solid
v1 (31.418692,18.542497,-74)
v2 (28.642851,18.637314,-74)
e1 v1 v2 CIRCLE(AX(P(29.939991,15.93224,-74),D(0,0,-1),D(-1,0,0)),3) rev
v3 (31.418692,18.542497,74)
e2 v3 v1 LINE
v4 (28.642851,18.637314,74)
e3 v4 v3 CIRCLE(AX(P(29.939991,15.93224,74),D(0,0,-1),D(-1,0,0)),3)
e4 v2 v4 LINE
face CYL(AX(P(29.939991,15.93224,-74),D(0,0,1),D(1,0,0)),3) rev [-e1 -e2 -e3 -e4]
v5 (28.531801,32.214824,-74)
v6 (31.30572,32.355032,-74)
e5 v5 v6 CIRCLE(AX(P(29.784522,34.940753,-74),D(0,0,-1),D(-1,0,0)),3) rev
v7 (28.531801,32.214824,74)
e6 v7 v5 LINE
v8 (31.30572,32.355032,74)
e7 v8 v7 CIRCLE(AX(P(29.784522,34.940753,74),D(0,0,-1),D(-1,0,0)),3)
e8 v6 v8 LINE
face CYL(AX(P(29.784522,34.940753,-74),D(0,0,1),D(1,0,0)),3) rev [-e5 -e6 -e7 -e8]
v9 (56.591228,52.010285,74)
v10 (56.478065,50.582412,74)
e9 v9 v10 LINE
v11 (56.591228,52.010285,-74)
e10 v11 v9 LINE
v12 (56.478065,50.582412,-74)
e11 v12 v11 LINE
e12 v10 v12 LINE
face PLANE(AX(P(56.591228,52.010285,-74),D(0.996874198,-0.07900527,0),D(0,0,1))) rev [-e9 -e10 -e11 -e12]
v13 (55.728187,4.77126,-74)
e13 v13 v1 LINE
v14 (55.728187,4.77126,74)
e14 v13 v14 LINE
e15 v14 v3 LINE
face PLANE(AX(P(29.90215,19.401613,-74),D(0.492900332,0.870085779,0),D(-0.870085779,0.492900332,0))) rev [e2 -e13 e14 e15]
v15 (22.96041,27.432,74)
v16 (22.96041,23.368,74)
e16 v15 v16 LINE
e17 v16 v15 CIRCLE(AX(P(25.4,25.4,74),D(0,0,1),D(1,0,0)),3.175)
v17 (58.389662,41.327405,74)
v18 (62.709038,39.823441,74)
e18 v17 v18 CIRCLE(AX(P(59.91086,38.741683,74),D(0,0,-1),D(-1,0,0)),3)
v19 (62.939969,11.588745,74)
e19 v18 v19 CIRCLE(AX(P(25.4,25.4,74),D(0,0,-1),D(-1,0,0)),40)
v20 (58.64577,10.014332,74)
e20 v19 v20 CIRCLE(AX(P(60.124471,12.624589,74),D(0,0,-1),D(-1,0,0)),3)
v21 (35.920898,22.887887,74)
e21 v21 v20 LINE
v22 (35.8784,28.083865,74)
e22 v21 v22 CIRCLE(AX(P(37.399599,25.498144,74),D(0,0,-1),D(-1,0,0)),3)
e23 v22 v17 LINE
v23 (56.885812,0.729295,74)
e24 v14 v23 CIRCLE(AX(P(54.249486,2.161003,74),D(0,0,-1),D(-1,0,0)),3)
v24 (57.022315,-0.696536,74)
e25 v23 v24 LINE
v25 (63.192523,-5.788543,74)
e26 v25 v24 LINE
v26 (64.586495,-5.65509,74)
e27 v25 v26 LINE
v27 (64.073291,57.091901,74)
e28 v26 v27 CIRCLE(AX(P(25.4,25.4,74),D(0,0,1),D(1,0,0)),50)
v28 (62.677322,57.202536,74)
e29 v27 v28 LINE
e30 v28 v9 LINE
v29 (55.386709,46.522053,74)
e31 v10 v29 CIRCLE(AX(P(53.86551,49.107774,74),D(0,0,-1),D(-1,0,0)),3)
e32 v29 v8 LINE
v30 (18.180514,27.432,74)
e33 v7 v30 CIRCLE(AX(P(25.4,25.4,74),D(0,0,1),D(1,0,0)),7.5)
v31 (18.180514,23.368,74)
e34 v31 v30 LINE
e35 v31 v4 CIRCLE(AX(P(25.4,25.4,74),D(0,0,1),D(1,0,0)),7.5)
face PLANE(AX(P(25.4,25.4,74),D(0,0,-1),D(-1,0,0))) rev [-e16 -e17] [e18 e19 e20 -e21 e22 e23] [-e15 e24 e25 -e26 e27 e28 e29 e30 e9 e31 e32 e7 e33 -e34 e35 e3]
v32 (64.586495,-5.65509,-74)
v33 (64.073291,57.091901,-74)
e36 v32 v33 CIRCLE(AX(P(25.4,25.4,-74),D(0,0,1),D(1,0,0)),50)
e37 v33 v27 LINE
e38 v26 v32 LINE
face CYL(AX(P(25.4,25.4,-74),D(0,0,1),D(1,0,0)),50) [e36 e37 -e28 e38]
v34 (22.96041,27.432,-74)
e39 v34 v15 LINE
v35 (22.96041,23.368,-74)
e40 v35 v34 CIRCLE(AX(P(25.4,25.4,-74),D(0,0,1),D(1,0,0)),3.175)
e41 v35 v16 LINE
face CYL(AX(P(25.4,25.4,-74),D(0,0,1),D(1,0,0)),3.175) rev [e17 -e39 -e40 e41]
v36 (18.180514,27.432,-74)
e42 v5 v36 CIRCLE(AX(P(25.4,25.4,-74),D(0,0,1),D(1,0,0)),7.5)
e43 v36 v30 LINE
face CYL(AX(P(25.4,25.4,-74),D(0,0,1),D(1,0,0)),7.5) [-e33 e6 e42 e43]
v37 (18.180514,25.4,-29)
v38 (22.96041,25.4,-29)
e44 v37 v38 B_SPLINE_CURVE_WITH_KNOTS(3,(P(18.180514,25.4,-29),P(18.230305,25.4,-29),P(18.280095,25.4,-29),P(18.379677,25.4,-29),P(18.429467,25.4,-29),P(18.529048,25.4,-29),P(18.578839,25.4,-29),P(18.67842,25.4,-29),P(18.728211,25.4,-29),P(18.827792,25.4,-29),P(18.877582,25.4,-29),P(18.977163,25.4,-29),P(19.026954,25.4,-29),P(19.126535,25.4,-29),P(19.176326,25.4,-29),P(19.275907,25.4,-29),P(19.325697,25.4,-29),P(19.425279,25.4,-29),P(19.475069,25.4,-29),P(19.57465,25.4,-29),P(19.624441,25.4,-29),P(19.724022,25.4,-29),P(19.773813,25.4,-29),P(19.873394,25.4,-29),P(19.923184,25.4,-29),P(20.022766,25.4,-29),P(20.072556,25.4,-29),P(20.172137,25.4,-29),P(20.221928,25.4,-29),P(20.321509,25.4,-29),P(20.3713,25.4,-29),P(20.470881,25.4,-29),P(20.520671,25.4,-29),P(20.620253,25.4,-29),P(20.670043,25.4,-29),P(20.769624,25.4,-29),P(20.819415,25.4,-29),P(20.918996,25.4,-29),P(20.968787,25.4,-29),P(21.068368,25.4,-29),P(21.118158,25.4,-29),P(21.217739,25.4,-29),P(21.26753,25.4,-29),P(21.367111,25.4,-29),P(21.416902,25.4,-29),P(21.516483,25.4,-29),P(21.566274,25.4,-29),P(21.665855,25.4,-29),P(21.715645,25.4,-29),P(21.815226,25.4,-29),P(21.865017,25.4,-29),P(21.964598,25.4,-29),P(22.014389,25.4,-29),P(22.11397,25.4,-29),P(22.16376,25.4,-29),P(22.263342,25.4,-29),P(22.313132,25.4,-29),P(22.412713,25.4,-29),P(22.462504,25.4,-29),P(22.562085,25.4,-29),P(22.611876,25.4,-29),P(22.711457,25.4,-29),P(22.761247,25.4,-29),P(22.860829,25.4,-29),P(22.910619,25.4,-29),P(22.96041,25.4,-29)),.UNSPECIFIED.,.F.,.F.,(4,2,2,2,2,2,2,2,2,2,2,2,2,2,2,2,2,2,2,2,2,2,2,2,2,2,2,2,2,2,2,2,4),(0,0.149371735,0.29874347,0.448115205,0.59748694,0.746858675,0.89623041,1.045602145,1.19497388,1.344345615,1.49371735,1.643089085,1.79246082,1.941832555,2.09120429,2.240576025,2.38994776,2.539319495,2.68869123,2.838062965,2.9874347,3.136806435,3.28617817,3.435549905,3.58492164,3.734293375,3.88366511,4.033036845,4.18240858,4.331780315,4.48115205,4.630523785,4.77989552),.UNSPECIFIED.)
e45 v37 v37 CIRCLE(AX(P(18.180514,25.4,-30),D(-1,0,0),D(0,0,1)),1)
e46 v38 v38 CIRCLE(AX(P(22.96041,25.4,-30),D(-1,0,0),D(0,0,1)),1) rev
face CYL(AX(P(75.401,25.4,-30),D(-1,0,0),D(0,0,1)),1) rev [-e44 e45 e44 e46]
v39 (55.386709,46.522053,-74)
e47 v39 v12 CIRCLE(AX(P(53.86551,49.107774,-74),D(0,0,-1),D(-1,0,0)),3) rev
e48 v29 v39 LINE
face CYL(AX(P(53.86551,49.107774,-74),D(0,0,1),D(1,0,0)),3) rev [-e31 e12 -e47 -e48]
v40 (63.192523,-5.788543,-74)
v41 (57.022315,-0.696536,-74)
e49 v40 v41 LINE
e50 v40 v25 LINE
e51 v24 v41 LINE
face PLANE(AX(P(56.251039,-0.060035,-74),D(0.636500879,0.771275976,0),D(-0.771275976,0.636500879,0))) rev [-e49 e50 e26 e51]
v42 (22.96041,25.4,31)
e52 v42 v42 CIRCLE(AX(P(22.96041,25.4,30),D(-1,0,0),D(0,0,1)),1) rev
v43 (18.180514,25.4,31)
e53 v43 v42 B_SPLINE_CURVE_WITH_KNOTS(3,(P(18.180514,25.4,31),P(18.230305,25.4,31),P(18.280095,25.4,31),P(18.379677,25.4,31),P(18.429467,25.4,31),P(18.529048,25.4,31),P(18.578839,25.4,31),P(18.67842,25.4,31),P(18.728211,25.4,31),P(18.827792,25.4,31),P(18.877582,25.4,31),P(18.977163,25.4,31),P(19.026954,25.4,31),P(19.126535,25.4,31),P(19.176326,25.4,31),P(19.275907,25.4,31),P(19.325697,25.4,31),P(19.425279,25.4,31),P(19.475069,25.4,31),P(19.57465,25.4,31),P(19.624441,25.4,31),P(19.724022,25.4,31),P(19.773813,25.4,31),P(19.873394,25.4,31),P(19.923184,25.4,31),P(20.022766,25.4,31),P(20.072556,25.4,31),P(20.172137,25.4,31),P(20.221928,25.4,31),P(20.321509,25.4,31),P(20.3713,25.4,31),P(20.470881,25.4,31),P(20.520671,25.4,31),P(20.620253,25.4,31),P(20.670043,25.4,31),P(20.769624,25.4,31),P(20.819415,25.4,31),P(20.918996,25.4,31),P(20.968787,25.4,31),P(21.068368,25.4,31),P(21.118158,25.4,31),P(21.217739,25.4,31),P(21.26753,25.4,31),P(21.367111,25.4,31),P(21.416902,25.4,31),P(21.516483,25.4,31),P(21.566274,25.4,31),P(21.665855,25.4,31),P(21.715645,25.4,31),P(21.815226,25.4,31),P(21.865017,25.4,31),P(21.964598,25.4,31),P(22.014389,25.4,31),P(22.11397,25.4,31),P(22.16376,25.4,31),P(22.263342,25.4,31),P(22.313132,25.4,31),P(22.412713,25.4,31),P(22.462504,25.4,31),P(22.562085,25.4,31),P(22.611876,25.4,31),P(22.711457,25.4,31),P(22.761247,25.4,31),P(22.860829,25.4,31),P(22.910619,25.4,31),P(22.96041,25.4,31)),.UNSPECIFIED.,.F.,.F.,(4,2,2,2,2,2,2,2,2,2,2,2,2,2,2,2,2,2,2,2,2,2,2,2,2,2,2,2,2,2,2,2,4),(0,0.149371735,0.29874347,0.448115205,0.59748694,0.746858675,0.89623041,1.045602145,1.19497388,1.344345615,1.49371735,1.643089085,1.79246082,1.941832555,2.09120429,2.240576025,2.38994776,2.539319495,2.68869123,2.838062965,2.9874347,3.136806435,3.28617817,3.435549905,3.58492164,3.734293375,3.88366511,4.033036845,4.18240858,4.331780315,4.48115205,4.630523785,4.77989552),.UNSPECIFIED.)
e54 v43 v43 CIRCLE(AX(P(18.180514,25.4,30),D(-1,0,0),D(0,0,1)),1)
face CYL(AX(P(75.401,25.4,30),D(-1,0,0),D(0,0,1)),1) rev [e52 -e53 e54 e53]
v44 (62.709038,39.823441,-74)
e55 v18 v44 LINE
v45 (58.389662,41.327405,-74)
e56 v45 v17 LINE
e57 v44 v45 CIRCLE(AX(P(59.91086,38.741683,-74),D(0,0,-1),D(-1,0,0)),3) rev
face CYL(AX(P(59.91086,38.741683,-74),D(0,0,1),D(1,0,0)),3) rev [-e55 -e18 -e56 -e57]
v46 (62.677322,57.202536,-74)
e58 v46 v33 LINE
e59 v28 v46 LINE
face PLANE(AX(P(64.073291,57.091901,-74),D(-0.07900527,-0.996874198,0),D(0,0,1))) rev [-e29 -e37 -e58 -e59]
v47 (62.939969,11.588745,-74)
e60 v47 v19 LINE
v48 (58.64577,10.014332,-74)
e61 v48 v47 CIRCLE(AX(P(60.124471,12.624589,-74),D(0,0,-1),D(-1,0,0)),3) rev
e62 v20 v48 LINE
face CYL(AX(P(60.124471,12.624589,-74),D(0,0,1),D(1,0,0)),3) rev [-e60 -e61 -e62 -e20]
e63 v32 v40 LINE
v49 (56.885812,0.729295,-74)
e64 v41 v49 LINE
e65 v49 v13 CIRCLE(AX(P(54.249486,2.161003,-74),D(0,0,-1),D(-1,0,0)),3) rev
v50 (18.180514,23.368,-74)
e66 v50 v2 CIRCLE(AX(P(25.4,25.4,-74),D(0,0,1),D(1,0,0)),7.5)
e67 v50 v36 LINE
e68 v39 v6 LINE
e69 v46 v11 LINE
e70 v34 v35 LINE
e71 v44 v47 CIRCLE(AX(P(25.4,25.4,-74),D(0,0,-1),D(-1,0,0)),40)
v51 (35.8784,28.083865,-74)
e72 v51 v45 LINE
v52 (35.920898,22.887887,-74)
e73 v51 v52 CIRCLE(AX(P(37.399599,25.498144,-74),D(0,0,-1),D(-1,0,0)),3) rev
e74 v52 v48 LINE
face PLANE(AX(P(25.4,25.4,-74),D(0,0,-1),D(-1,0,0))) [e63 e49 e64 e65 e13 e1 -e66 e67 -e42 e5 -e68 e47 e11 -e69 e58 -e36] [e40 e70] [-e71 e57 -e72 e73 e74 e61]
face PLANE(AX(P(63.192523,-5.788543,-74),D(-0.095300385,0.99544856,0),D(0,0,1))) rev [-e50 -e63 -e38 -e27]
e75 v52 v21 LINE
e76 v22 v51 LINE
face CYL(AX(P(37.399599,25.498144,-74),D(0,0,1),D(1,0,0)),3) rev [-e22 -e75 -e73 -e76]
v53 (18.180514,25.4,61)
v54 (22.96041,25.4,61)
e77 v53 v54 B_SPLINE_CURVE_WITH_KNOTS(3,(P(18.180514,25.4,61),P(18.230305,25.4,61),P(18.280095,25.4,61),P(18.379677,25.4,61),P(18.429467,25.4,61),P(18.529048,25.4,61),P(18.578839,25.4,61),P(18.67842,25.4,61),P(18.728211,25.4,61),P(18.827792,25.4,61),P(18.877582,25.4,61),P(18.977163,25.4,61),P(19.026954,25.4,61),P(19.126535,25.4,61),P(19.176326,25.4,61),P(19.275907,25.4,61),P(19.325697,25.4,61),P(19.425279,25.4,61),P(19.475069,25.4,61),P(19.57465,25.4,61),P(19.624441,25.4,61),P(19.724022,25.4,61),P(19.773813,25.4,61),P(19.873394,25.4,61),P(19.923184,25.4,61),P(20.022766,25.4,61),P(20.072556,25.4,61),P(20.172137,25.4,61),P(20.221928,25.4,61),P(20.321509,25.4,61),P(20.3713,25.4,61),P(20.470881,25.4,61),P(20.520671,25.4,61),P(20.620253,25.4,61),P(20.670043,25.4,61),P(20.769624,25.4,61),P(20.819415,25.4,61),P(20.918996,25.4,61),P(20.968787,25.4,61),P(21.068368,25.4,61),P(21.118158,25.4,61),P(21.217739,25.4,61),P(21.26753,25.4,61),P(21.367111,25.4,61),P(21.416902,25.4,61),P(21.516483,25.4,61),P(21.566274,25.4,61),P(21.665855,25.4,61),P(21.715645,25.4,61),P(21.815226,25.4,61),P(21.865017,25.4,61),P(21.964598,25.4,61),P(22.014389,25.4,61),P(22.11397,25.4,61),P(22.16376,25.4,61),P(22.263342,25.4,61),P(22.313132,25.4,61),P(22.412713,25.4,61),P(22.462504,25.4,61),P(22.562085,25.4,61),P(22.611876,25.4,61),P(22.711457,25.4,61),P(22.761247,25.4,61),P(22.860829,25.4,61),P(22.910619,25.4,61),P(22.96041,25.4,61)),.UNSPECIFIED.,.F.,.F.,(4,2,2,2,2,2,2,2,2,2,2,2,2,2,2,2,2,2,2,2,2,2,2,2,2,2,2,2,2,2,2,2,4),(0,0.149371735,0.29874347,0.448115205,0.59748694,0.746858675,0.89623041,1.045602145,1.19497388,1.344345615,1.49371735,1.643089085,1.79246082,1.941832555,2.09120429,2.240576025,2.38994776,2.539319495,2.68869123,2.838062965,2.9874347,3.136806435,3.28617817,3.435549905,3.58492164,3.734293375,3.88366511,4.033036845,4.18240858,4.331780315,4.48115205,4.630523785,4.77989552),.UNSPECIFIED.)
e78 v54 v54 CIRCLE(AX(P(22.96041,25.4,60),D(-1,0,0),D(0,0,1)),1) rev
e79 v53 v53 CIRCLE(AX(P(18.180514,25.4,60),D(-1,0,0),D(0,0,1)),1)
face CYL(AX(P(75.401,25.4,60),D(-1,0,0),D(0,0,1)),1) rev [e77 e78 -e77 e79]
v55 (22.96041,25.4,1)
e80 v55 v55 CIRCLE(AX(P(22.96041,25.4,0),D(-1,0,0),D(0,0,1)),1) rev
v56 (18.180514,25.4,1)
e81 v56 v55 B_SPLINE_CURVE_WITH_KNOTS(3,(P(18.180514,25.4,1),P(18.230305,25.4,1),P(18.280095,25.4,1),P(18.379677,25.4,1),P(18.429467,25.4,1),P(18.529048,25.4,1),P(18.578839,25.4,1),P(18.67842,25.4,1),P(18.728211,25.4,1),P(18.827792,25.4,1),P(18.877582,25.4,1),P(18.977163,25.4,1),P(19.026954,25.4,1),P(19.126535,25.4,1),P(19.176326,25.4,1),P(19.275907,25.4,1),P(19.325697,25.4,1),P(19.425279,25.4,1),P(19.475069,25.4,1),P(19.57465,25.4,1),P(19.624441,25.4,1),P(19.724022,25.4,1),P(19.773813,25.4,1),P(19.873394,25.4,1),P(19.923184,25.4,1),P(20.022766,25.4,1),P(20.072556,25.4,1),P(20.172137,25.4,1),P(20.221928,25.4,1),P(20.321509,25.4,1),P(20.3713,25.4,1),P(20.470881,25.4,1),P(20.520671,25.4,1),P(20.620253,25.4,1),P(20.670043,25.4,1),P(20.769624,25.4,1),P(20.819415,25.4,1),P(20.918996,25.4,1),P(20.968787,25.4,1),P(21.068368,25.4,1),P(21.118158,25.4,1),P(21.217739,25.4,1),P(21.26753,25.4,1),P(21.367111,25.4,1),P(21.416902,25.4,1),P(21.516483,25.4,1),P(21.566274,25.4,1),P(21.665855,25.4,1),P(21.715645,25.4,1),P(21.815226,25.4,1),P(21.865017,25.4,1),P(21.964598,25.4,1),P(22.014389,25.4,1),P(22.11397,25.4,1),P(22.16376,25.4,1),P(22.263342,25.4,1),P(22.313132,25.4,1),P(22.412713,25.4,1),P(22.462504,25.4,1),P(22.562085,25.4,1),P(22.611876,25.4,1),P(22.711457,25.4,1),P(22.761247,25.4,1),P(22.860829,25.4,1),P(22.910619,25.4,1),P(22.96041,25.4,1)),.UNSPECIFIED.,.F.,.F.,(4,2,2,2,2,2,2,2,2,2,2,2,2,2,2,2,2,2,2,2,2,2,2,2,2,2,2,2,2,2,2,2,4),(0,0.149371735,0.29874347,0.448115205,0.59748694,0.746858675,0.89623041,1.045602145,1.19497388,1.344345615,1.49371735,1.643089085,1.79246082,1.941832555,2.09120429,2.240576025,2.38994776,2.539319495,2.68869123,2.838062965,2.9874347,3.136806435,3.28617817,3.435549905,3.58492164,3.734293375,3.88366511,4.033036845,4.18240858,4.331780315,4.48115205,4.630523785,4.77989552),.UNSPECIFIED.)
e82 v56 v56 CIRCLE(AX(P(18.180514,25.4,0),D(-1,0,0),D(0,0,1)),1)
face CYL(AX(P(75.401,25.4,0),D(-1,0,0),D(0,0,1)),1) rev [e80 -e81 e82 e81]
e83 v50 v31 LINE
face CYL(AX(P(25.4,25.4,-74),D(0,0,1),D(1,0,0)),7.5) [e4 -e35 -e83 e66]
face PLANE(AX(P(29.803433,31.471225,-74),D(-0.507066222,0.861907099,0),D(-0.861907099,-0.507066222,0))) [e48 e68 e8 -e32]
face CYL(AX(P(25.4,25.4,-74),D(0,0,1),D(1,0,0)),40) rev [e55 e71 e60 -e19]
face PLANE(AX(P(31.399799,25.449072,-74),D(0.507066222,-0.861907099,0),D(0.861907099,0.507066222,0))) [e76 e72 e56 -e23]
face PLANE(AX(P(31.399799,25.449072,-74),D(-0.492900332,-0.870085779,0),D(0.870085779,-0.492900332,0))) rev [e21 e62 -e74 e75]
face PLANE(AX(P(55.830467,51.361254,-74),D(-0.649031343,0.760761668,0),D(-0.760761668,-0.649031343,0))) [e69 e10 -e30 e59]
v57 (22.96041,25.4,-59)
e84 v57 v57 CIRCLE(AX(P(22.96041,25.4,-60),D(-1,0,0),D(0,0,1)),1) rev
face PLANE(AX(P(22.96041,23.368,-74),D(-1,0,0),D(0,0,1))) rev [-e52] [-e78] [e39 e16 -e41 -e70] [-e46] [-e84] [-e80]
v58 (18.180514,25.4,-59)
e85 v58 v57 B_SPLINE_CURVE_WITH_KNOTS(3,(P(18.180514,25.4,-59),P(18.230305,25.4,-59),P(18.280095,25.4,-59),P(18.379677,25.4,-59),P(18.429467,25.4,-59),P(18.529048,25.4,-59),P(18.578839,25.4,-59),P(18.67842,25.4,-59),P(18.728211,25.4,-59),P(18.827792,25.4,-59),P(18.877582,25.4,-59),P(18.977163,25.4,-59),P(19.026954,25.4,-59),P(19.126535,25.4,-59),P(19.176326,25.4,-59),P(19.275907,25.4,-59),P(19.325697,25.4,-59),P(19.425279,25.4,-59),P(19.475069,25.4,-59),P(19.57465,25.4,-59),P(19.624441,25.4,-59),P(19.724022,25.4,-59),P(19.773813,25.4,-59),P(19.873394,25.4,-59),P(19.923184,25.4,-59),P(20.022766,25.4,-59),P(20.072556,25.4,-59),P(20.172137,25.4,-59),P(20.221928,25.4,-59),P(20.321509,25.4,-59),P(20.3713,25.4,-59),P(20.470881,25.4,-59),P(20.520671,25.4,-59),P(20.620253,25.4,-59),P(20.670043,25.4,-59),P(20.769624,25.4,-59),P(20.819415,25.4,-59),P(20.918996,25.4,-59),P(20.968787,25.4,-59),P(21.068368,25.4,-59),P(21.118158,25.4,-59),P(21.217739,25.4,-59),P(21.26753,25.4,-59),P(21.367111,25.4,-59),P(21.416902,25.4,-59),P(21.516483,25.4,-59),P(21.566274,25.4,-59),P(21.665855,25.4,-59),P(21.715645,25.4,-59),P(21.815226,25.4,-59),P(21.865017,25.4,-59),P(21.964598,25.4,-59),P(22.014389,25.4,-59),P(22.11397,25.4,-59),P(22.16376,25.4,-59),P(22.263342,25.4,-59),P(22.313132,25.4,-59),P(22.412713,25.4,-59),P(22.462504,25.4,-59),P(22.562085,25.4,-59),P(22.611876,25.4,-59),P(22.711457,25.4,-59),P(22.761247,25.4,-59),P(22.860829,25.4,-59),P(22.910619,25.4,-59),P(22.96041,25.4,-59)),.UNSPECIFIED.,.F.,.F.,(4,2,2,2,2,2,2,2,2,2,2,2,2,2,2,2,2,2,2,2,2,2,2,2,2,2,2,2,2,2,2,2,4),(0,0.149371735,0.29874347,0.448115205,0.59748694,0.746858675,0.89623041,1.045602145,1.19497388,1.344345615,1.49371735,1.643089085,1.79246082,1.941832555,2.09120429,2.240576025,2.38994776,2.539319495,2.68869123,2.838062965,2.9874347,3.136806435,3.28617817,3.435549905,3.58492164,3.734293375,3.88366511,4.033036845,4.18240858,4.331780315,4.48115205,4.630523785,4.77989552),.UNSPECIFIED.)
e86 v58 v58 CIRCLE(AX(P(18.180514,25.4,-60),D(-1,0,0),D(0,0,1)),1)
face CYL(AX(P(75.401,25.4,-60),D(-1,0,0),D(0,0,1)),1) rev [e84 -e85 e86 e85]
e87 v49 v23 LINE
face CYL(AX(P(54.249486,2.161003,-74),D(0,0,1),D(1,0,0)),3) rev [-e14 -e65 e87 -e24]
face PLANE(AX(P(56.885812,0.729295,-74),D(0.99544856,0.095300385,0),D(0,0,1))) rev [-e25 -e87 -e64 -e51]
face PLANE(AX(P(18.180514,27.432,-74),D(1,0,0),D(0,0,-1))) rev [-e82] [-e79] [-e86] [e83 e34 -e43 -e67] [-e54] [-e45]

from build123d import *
from build123d.topology import SkipClean

# Parameters (mm, degrees)
BOSS_EXTRUDE1_DEPTH     = 74
CHAMFER1_SIZE           = 1
FILLET1_R               = 3
CUT_EXTRUDE1_DEPTH      = 121.138628729
CUT_EXTRUDE1_DEPTH_BACK = 121.138628729
CUT_EXTRUDE2_REACH      = 111.646
SKETCH4_R               = 1


with BuildPart() as part:
    # Sketch1 → Boss-Extrude1 (new, symmetric)
    with BuildSketch(Plane.XY):
        with BuildLine():
            Line((55.830466766, 51.361253738), (63.438083445, 57.851567172))
            ThreePointArc((63.438083445, 57.851567172), (72.243195979, 42.88470747), (75.398327752, 25.808934001))
            Line((75.398327752, 25.808934001), (65.398662212, 25.727147202))
            ThreePointArc((65.398662212, 25.727147202), (64.324262485, 34.614216947), (61.300381376, 43.039802177))
            Line((61.300381376, 43.039802177), (31.399799374, 25.449072083))
            Line((31.399799374, 25.449072083), (26.399966604, 25.408178684))
            ThreePointArc((26.399966604, 25.408178684), (25.395910676, 26.399991642), (24.40000005, 25.400000004))
            ThreePointArc((24.40000005, 25.400000004), (24.411675325, 25.24763781), (24.446428526, 25.098833357))
            Line((24.446428526, 25.098833357), (18.248213622, 23.141250154))
            ThreePointArc((18.248213622, 23.141250154), (17.987564613, 24.25728355), (17.90000005, 25.400000004))
            ThreePointArc((17.90000005, 25.400000004), (21.992343112, 32.081158151), (29.803433168, 31.471225314))
            Line((29.803433168, 31.471225314), (58.257984046, 48.211244769))
            ThreePointArc((58.257984046, 48.211244769), (57.083396924, 49.816436323), (55.830466766, 51.361253738))
        make_face()
    boss_extrude1 = extrude(amount=BOSS_EXTRUDE1_DEPTH, both=True)

    # Mirror1: Boss-Extrude1 across plane
    with SkipClean():  # the faces are left unmerged after this step: merging them gives an invalid solid
        add(boss_extrude1.mirror(Plane(origin=(-0.206032496, 25.190569454, 0), x_dir=(0, 0, 1), z_dir=(0.008178679945042752, -0.9999665540378622, 0))))

    # Chamfer1
    # the kernel refuses this chamfer: 1 mm, written as the material it takes off along each edge
    with BuildSketch(Plane(origin=(55.830466766, 51.361253738, -76.604800739), x_dir=(0.7607616678932755, 0.6490313433604278, 0), z_dir=(0, 0, 1))) as chamfer1_piece_1:
        with BuildLine():
            Line((CHAMFER1_SIZE, 0), (-0.01282473, -1.01282473))
            ThreePointArc((-0.01282473, -1.01282473), (-0.003390265, -0.520777989), (0, 0))
            Line((0, 0), (CHAMFER1_SIZE, 0))
        make_face()
    extrude(amount=153.209601479, mode=Mode.SUBTRACT)
    with BuildSketch(Plane(origin=(63.438083445, 57.851567172, 76.571682988), x_dir=(-0.7607616678932776, -0.6490313433604255, 0), z_dir=(0, 0, -1))) as chamfer1_piece_2:
        with BuildLine():
            Line((CHAMFER1_SIZE, 0), (0.009805807, -0.990194193))
            ThreePointArc((0.009805807, -0.990194193), (0.002592086, -0.509118755), (0, 0))
            Line((0, 0), (CHAMFER1_SIZE, 0))
        make_face()
    extrude(amount=153.143365976, mode=Mode.SUBTRACT)
    with BuildSketch(Plane(origin=(63.963798858, -6.425043932, 76.571682988), x_dir=(0.6288321665267481, 0.7775410640868277, 0), z_dir=(0, 0, -1))) as chamfer1_piece_3:
        with BuildLine():
            Line((0.990242745, 0), (CHAMFER1_SIZE * 0.00990242744899, -CHAMFER1_SIZE * 0.999950969763))
            Line((CHAMFER1_SIZE * 0.00990242744899, -CHAMFER1_SIZE * 0.999950969763), (0, 0))
            ThreePointArc((0, 0), (0.509119461, 0.002449552), (0.990242745, 0))
        make_face()
    extrude(amount=153.143365976, mode=Mode.SUBTRACT)
    with BuildSketch(Plane(origin=(56.251039097, -0.060035145, -76.604800739), x_dir=(0.6266844831673307, 0.7792730962616993, 0), z_dir=(0, 0, 1))) as chamfer1_piece_4:
        with BuildLine():
            Line((1.012905922, 0), (-CHAMFER1_SIZE * 0.0126613240298, -CHAMFER1_SIZE * 0.999919842224))
            Line((-CHAMFER1_SIZE * 0.0126613240298, -CHAMFER1_SIZE * 0.999919842224), (0, 0))
            ThreePointArc((0, 0), (0.520779169, -0.003203746), (1.012905922, 0))
        make_face()
    extrude(amount=153.209601479, mode=Mode.SUBTRACT)

    # Fillet1
    # the kernel refuses this fillet: 3 mm, written as the material it adds along each edge
    with BuildSketch(Plane(origin=(61.300381376, 43.039802177, 74), x_dir=(-0.8619070987590498, -0.5070662216207636, 0), z_dir=(0, 0, -1))) as fillet1_piece_1:
        with BuildLine():
            CenterArc((3.377068823, -3), FILLET1_R, 90, 99.332418184)
            Line((0.416776456, -3.486486486), (0.357570609, -3.496216216))
            ThreePointArc((0.357570609, -3.496216216), (0.110537283, -1.754940397), (-0.059831012, -0.0045))
            Line((-0.059831012, -0.0045), (0, 0.06))
            Line((0, 0.06), (3.377068823, 0.06))
            Line((3.377068823, 0.06), (3.377068823, 0))
        make_face()
    extrude(amount=148)
    with BuildSketch(Plane(origin=(31.399799374, 25.449072083, 74), x_dir=(0.861907098759051, 0.5070662216207618, 0), z_dir=(0, 0, -1))) as fillet1_piece_2:
        with BuildLine():
            CenterArc((FILLET1_R * 1.73205080757, FILLET1_R), FILLET1_R, 150, 120)
            Line((FILLET1_R * 0.866025403784, FILLET1_R * 1.5), (FILLET1_R * 0.848704895709, FILLET1_R * 1.51))
            Line((FILLET1_R * 0.848704895709, FILLET1_R * 1.51), (-FILLET1_R * 0.0346410161514, -FILLET1_R * 0.02))
            Line((-FILLET1_R * 0.0346410161514, -FILLET1_R * 0.02), (FILLET1_R * 1.73205080757, -FILLET1_R * 0.02))
            Line((FILLET1_R * 1.73205080757, -FILLET1_R * 0.02), (FILLET1_R * 1.73205080757, 0))
        make_face()
    extrude(amount=148)
    with BuildSketch(Plane(origin=(29.803433168, 31.471225314, -74), x_dir=(-0.8632427379298097, 0.5047890405025113, 0), z_dir=(0, 0, 1))) as fillet1_piece_3:
        with BuildLine():
            CenterArc((1.767704789, -2.985498375), FILLET1_R, 95.63586305, 55.150095421)
            Line((-0.850702684, -1.521277659), (-0.903070833, -1.491993244))
            Line((-0.903070833, -1.491993244), (-0.052368149, 0.029284414))
            Line((-0.052368149, 0.029284414), (0.005892349, 0.059709968))
            ThreePointArc((0.005892349, 0.059709968), (0.736543662, 0.023745938), (1.467194975, 0.059709968))
            Line((1.467194975, 0.059709968), (1.473087324, 0))
        make_face()
    extrude(amount=148)
    with BuildSketch(Plane(origin=(58.257984046, 48.211244769, -74), x_dir=(-0.6003331349359272, 0.7997500403863709, 0), z_dir=(0, 0, 1))) as fillet1_piece_4:
        with BuildLine():
            CenterArc((3.35394685, 2.974664865), FILLET1_R, 173.574848661, 88.973633867)
            Line((0.372790176, 3.310380343), (0.313167042, 3.317094653))
            Line((0.313167042, 3.317094653), (-0.059623133, 0.00671431))
            Line((-0.059623133, 0.00671431), (-0.002223664, -0.05995878))
            ThreePointArc((-0.002223664, -0.05995878), (1.482442617, -0.087479891), (2.957104003, -0.059493297))
            Line((2.957104003, -0.059493297), (2.964885235, 0))
        make_face()
    extrude(amount=148)
    with BuildSketch(Plane(origin=(61.584109507, 8.349773529, 74), x_dir=(-0.8700857787040926, 0.49290033241710485, 0), z_dir=(0, 0, -1))) as fillet1_piece_5:
        with BuildLine():
            CenterArc((3.377068823, 3), FILLET1_R, 170.667581816, 99.332418184)
            Line((0.416776456, 3.486486486), (0.357570609, 3.496216216))
            ThreePointArc((0.357570609, 3.496216216), (0.110537283, 1.754940397), (-0.059831012, 0.0045))
            Line((-0.059831012, 0.0045), (0, -0.06))
            Line((0, -0.06), (3.377068823, -0.06))
            Line((3.377068823, -0.06), (3.377068823, 0))
        make_face()
    extrude(amount=148)
    with BuildSketch(Plane(origin=(58.626707512, 3.129258857, -74), x_dir=(-0.870085778704093, 0.49290033241710457, 0), z_dir=(0, 0, 1))) as fillet1_piece_6:
        with BuildLine():
            CenterArc((3.331304629, 3), FILLET1_R, 181.026366133, 88.973633867)
            Line((0.331785955, 2.946262469), (0.271795581, 2.945187718))
            ThreePointArc((0.271795581, 2.945187718), (0.078962557, 1.482920686), (-0.059831012, 0.0045))
            Line((-0.059831012, 0.0045), (0, -0.06))
            Line((0, -0.06), (3.331304629, -0.06))
            Line((3.331304629, -0.06), (3.331304629, 0))
        make_face()
    extrude(amount=148)
    with BuildSketch(Plane(origin=(29.902149966, 19.401613043, -74), x_dir=(-0.8548705120852164, -0.5188414088786282, 0), z_dir=(0, 0, 1))) as fillet1_piece_7:
        with BuildLine():
            CenterArc((1.767704789, 2.985498375), FILLET1_R, 209.214041529, 55.150095421)
            Line((-0.850702684, 1.521277659), (-0.903070833, 1.491993244))
            Line((-0.903070833, 1.491993244), (-0.052368149, -0.029284414))
            Line((-0.052368149, -0.029284414), (0.005892349, -0.059709968))
            ThreePointArc((0.005892349, -0.059709968), (0.736543662, -0.023745938), (1.467194975, -0.059709968))
            Line((1.467194975, -0.059709968), (1.473087324, 0))
        make_face()
    extrude(amount=148)

    # Sketch3 → Cut-Extrude1 (cut, two sides: drawn at the far end of the back side and taken through both)
    with BuildSketch(Plane.XY.offset(-CUT_EXTRUDE1_DEPTH_BACK)):
        with BuildLine():
            Line((22.960409716, 23.368000004), (22.960409716, 27.432000004))
            ThreePointArc((22.960409716, 27.432000004), (28.57500005, 25.400000004), (22.960409716, 23.368000004))
        make_face()
        with BuildLine():
            Line((18.180514196, 27.432000004), (18.180514196, 23.368000004))
            ThreePointArc((18.180514196, 23.368000004), (17.90000005, 25.400000004), (18.180514196, 27.432000004))
        make_face()
    extrude(amount=CUT_EXTRUDE1_DEPTH + CUT_EXTRUDE1_DEPTH_BACK, mode=Mode.SUBTRACT)

    # Sketch4 → Cut-Extrude2 (cut, up to next)
    with BuildSketch(Plane.ZY.offset(-18.180514196), mode=Mode.PRIVATE) as cut_extrude2_sk1:
        with Locations((0, 25.400000004)):
            Circle(SKETCH4_R)
    cut_extrude2_tool1 = extrude(cut_extrude2_sk1.sketch, amount=-CUT_EXTRUDE2_REACH, mode=Mode.PRIVATE) & part.part
    # Sketch4 → Cut-Extrude2 (cut, up to next)
    with BuildSketch(Plane.ZY.offset(-18.180514196), mode=Mode.PRIVATE) as cut_extrude2_sk2:
        with Locations((30, 25.400000004)):
            Circle(SKETCH4_R)
    cut_extrude2_tool2 = extrude(cut_extrude2_sk2.sketch, amount=-CUT_EXTRUDE2_REACH, mode=Mode.PRIVATE) & part.part
    # Sketch4 → Cut-Extrude2 (cut, up to next)
    with BuildSketch(Plane.ZY.offset(-18.180514196), mode=Mode.PRIVATE) as cut_extrude2_sk3:
        with Locations((60, 25.400000004)):
            Circle(SKETCH4_R)
    cut_extrude2_tool3 = extrude(cut_extrude2_sk3.sketch, amount=-CUT_EXTRUDE2_REACH, mode=Mode.PRIVATE) & part.part
    # Sketch4 → Cut-Extrude2 (cut, up to next)
    with BuildSketch(Plane.ZY.offset(-18.180514196), mode=Mode.PRIVATE) as cut_extrude2_sk4:
        with Locations((-30, 25.400000004)):
            Circle(SKETCH4_R)
    cut_extrude2_tool4 = extrude(cut_extrude2_sk4.sketch, amount=-CUT_EXTRUDE2_REACH, mode=Mode.PRIVATE) & part.part
    # Sketch4 → Cut-Extrude2 (cut, up to next)
    with BuildSketch(Plane.ZY.offset(-18.180514196), mode=Mode.PRIVATE) as cut_extrude2_sk5:
        with Locations((-60, 25.400000004)):
            Circle(SKETCH4_R)
    cut_extrude2_tool5 = extrude(cut_extrude2_sk5.sketch, amount=-CUT_EXTRUDE2_REACH, mode=Mode.PRIVATE) & part.part
    add(cut_extrude2_tool1.solids().sort_by_distance((18.180514, 25.4, 0))[0], mode=Mode.SUBTRACT)
    add(cut_extrude2_tool2.solids().sort_by_distance((18.180514, 25.4, 30))[0], mode=Mode.SUBTRACT)
    add(cut_extrude2_tool3.solids().sort_by_distance((18.180514, 25.4, 60))[0], mode=Mode.SUBTRACT)
    add(cut_extrude2_tool4.solids().sort_by_distance((18.180514, 25.4, -30))[0], mode=Mode.SUBTRACT)
    add(cut_extrude2_tool5.solids().sort_by_distance((18.180514, 25.4, -60))[0], mode=Mode.SUBTRACT)


solid = part.part
